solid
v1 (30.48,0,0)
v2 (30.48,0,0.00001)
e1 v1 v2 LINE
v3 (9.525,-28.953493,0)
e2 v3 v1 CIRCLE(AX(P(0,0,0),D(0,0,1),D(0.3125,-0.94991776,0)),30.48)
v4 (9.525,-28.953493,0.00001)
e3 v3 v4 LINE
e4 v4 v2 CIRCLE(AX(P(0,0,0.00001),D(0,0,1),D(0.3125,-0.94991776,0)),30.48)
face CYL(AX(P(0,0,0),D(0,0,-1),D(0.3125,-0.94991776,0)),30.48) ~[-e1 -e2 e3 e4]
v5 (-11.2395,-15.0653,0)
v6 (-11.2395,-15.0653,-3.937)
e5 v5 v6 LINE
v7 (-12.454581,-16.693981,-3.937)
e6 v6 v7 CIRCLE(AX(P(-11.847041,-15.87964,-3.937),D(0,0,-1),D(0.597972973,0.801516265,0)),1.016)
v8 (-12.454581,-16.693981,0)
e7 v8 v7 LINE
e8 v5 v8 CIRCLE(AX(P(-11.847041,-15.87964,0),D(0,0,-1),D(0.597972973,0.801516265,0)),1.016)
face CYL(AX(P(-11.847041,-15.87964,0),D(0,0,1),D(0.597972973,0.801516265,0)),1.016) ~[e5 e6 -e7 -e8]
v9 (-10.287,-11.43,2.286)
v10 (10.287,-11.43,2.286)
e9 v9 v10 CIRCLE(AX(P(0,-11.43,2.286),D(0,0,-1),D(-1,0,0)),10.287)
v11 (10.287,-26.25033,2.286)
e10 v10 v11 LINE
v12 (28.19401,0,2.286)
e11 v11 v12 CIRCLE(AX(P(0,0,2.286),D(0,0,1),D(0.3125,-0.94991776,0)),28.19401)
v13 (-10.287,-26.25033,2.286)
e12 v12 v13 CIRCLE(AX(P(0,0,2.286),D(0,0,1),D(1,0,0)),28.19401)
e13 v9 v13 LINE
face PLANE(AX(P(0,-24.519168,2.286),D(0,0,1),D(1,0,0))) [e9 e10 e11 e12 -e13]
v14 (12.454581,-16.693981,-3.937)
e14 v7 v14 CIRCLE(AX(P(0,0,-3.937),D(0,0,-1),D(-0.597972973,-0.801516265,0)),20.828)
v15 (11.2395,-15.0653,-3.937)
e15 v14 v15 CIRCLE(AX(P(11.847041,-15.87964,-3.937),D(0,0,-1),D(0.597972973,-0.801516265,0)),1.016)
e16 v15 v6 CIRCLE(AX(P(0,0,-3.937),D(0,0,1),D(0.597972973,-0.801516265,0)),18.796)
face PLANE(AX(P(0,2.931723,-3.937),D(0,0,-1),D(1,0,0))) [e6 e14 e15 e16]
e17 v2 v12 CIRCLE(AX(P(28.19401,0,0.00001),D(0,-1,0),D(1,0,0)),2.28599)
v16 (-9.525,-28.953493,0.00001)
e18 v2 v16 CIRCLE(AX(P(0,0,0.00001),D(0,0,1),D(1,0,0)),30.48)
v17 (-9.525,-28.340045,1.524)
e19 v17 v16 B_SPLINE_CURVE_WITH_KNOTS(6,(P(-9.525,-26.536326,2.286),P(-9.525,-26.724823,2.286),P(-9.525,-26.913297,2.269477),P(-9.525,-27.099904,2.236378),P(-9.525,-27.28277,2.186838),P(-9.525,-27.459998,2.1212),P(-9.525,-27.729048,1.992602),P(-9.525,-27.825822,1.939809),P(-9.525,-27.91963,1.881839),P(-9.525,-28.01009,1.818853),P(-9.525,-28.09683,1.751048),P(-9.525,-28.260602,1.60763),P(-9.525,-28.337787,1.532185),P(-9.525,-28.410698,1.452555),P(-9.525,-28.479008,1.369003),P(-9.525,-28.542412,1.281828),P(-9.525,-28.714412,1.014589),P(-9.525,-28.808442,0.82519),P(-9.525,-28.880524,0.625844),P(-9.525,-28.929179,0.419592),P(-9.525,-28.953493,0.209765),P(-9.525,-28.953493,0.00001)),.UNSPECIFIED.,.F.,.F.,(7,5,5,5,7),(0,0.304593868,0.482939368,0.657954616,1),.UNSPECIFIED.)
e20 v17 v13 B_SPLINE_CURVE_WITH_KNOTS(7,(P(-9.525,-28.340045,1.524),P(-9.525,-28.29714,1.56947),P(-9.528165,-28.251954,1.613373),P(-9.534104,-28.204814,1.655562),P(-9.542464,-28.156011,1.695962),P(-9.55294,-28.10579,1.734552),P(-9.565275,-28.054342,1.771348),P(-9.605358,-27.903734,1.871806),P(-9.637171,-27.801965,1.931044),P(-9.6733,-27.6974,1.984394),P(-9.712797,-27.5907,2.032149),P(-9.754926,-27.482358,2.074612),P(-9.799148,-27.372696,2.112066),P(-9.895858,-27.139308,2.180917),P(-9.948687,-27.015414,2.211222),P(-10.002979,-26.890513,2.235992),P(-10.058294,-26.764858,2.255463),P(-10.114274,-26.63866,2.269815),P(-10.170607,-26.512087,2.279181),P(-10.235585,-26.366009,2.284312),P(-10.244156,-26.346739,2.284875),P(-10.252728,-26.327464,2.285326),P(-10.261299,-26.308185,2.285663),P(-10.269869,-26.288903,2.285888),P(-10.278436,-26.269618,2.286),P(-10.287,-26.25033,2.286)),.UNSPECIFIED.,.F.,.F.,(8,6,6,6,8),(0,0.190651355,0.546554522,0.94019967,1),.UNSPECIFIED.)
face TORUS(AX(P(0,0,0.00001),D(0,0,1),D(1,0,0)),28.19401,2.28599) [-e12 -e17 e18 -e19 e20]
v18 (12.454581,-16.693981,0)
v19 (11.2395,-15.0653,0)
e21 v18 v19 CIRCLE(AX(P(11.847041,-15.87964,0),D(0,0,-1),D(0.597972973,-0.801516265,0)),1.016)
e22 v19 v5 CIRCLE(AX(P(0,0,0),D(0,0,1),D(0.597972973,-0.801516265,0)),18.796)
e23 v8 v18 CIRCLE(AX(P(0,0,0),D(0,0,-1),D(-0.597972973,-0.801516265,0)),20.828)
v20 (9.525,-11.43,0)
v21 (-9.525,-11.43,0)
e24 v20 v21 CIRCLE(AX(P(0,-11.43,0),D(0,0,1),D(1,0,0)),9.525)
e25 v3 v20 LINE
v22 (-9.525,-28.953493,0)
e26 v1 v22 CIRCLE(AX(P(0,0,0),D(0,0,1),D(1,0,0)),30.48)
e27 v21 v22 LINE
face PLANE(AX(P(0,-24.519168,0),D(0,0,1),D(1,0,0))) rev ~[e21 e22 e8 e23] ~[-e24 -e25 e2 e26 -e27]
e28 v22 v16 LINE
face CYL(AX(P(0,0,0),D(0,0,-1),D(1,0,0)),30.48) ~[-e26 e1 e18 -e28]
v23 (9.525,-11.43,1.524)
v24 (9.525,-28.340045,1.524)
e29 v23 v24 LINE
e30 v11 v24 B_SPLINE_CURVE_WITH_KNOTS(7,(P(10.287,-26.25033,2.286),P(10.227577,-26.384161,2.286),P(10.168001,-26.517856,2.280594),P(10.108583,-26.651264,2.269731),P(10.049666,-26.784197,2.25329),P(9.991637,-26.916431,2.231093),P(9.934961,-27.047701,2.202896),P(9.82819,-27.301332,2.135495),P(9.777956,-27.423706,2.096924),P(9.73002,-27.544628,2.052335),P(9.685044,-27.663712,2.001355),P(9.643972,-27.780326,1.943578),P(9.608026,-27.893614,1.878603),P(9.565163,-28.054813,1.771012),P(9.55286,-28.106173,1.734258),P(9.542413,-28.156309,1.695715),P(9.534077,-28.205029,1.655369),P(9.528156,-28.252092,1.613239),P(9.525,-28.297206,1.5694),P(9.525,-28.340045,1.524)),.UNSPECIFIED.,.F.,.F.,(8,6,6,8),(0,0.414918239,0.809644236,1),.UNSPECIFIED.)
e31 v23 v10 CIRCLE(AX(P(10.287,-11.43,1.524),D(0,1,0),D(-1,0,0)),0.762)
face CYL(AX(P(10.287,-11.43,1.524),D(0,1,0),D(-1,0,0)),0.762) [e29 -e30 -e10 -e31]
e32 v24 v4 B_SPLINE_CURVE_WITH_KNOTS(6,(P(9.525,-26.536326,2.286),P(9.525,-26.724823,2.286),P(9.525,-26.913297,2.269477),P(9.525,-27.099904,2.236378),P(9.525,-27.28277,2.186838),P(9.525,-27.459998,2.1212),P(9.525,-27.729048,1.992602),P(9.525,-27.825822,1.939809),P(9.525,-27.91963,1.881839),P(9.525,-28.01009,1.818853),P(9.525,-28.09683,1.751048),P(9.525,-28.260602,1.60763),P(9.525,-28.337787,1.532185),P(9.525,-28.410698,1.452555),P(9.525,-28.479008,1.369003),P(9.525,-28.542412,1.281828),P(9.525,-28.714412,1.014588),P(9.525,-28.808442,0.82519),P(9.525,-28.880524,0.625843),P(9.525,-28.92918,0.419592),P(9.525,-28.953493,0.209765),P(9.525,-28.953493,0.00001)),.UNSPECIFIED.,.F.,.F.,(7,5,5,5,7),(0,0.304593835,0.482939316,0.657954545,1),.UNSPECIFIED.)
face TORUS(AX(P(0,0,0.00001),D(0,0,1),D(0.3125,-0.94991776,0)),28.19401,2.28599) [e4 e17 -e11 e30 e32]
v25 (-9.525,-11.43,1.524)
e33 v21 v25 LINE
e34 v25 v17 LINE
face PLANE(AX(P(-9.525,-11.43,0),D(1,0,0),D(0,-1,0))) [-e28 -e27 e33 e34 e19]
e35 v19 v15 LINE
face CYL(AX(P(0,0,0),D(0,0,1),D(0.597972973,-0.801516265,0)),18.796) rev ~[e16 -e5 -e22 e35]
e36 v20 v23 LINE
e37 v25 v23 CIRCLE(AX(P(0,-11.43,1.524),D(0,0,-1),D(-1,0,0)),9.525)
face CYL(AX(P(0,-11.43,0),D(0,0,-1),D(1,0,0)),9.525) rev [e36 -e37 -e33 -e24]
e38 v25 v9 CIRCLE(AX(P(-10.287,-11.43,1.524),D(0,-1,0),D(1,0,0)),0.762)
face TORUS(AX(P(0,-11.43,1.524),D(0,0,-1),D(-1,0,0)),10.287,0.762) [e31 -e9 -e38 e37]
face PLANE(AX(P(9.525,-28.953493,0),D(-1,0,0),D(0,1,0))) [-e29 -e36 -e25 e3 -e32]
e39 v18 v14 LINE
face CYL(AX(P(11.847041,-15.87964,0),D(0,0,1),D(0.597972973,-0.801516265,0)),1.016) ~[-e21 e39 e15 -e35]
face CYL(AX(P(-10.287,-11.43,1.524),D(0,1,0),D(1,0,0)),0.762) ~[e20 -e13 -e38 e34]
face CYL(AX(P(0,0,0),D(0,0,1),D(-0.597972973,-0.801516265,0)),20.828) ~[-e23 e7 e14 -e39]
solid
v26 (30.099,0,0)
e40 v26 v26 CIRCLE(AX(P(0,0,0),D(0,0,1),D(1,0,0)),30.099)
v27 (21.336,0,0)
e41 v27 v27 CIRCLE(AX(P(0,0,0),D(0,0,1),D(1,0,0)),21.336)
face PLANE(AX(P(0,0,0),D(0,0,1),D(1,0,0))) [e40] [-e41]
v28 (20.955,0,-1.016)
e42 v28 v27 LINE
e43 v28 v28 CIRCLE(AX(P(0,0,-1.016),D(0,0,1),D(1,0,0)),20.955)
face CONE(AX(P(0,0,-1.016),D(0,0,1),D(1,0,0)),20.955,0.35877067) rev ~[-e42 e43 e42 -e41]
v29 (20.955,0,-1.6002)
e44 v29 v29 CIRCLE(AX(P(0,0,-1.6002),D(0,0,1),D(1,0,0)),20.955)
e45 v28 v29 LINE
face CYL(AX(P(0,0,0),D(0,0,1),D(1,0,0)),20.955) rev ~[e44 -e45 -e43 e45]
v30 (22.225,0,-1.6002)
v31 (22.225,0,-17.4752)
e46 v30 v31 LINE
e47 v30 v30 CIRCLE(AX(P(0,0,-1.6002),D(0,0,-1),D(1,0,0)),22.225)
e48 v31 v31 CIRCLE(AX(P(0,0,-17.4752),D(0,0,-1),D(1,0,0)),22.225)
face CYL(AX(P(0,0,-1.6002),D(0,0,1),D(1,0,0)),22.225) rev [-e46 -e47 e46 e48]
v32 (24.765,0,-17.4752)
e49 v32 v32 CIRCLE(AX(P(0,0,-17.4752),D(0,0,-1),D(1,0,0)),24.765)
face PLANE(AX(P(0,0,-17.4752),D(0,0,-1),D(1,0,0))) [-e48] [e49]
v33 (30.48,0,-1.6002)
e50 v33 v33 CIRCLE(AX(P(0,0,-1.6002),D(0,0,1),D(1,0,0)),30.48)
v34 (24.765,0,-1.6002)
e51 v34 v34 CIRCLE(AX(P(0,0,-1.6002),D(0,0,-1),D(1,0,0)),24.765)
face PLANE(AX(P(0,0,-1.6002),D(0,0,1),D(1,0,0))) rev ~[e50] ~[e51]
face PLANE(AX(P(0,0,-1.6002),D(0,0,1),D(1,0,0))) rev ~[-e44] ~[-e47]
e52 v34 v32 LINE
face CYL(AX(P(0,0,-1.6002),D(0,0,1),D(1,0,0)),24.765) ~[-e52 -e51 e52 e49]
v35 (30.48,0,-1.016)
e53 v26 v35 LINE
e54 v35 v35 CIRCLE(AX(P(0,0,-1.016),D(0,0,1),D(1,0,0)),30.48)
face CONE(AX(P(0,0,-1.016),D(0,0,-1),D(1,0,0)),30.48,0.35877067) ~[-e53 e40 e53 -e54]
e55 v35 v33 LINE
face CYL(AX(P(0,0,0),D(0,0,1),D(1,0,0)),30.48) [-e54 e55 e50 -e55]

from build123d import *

# Parameters (mm, degrees)
F0_R        = 30.48
F0_R_2      = 20.955
F1_DEPTH    = 1.6002
F2_R        = 24.765
F2_R_2      = 22.225
F3_DEPTH    = 15.875
F5_DEPTH    = 2.286
F6_R        = 2.28599
F7_DEPTH    = 2.287
F8_T1_DEPTH = 17.0113255723
F8_T4_ANGLE = 180
F10_DEPTH   = 3.937
F11_SIZE2   = 1.016
F11_SIZE    = 0.381
F12_SIZE2   = 0.381
F12_SIZE    = 1.016


# Not quite as in the source:
# - a fillet or chamfer that OpenCascade refuses, or shapes differently, is made with other operations: its cross-section is extruded or revolved along the edge and cut away or added
# - a fillet or chamfer is up to 0.001 mm smaller than in the source, because OpenCascade refuses the exact size


with BuildPart() as f1:
    # F0 (on Top) → F1 (new body)
    with BuildSketch(Plane.XY):
        Circle(F0_R)
        Circle(F0_R_2, mode=Mode.SUBTRACT)
    extrude(amount=-F1_DEPTH)

    # F2 (on face) → F3 (join)
    with BuildSketch(Plane(origin=(0, 0, -1.6002), x_dir=(1, 0, 0), z_dir=(0, 0, -1))):
        Circle(F2_R)
        Circle(F2_R_2, mode=Mode.SUBTRACT)
    extrude(amount=F3_DEPTH)

    # F11
    f11_edges = [f1.edges().sort_by_distance(p)[0] for p in [
        (-30.48, 0, 0),
    ]]
    f11_side = f1.faces().sort_by_distance((-29.617895, 0, 0))[0]
    chamfer(f11_edges, length=F11_SIZE, length2=F11_SIZE2, reference=f11_side)

    # F12
    f12_edges = [f1.edges().sort_by_distance(p)[0] for p in [
        (-20.955, 0, 0),
    ]]
    f12_side = f1.faces().sort_by_distance((-20.955, 0, -0.8001))[0]
    chamfer(f12_edges, length=F12_SIZE, length2=F12_SIZE2, reference=f12_side)


with BuildPart() as f5:
    # F4 (on face) → F5 (new body)
    with BuildSketch(Plane.XY):
        with BuildLine():
            Line((-9.525, -18.66511184), (-9.525, -28.9534933126))
            ThreePointArc((-9.525, -28.9534933126), (0, -30.48), (9.525, -28.9534933126))
            Line((9.525, -28.9534933126), (9.525, -18.66511184))
            ThreePointArc((9.525, -18.66511184), (0, -20.955), (-9.525, -18.66511184))
        make_face()
        with BuildLine():
            ThreePointArc((9.525, -28.9534933126), (24.6916220609, -17.8704840449), (30.48, 0))
            ThreePointArc((30.48, 0), (-17.8704840449, 24.6916220609), (-9.525, -28.9534933126))
            Line((-9.525, -28.9534933126), (-9.525, -18.66511184))
            ThreePointArc((-9.525, -18.66511184), (-10.9433918417, 17.8704840449), (20.955, 0))
            ThreePointArc((20.955, 0), (17.8704840449, -10.9433918417), (9.525, -18.66511184))
            Line((9.525, -18.66511184), (9.525, -28.9534933126))
        make_face()
        with BuildLine():
            Line((-9.525, -11.43), (-9.525, -18.66511184))
            ThreePointArc((-9.525, -18.66511184), (0, -20.955), (9.525, -18.66511184))
            Line((9.525, -18.66511184), (9.525, -11.43))
            ThreePointArc((9.525, -11.43), (0, -1.905), (-9.525, -11.43))
        make_face()
        with BuildLine():
            ThreePointArc((20.955, 0), (-10.9433918417, 17.8704840449), (-9.525, -18.66511184))
            Line((-9.525, -18.66511184), (-9.525, -11.43))
            ThreePointArc((-9.525, -11.43), (0, -1.905), (9.525, -11.43))
            Line((9.525, -11.43), (9.525, -18.66511184))
            ThreePointArc((9.525, -18.66511184), (17.8704840449, -10.9433918417), (20.955, 0))
        make_face()
    extrude(amount=F5_DEPTH)

    # F6 (radius 2.286 in the source; OpenCascade refuses exactly that, so slightly less here)
    f6_edges = [f5.edges().sort_by_distance(p)[0] for p in [
        (-9.525, 28.953493, 2.286),
    ]]
    fillet(f6_edges, radius=F6_R)

    # F4 (on face) → F7 (cut, through all)
    with BuildSketch(Plane.XY):
        with BuildLine():
            Line((-9.525, -11.43), (-9.525, -18.66511184))
            ThreePointArc((-9.525, -18.66511184), (0, -20.955), (9.525, -18.66511184))
            Line((9.525, -18.66511184), (9.525, -11.43))
            ThreePointArc((9.525, -11.43), (0, -1.905), (-9.525, -11.43))
        make_face()
        with BuildLine():
            Line((-9.525, -18.66511184), (-9.525, -28.9534933126))
            ThreePointArc((-9.525, -28.9534933126), (0, -30.48), (9.525, -28.9534933126))
            Line((9.525, -28.9534933126), (9.525, -18.66511184))
            ThreePointArc((9.525, -18.66511184), (0, -20.955), (-9.525, -18.66511184))
        make_face()
    extrude(amount=F7_DEPTH, mode=Mode.SUBTRACT)

    # F8: fillet of radius 0.762 on 3 edges, made by hand

    # F8_s2 → F8_t1 (cut)
    with BuildSketch(Plane.XZ.offset(11.43)):
        with BuildLine():
            ThreePointArc((-9.525, 1.524), (-9.7481846327, 2.0628153673), (-10.287, 2.286))
            Line((-10.287, 2.286), (-9.525, 2.286))
            Line((-9.525, 2.286), (-9.525, 1.524))
        make_face()
        with BuildLine():
            ThreePointArc((9.525, 1.524), (9.7481846327, 2.0628153673), (10.287, 2.286))
            Line((10.287, 2.286), (9.525, 2.286))
            Line((9.525, 2.286), (9.525, 1.524))
        make_face()
    extrude(amount=F8_T1_DEPTH, mode=Mode.SUBTRACT)

    # F8_s3 → F8_t4 (revolve, cut)
    with BuildSketch(Plane.XZ.offset(11.43)):
        with BuildLine():
            ThreePointArc((-9.525, 1.524), (-9.7481846327, 2.0628153673), (-10.287, 2.286))
            Line((-10.287, 2.286), (-9.525, 2.286))
            Line((-9.525, 2.286), (-9.525, 1.524))
        make_face()
    revolve(axis=Axis((0, -11.43, 2.286), (0, 0, -1)), revolution_arc=F8_T4_ANGLE, mode=Mode.SUBTRACT)

    # F9 (on face) → F10 (join)
    with BuildSketch(Plane(origin=(0, 0, 0), x_dir=(1, 0, 0), z_dir=(0, 0, -1))):
        with BuildLine():
            ThreePointArc((-12.4545810811, 16.6939807744), (0, -20.828), (12.4545810811, 16.6939807744))
            ThreePointArc((12.4545810811, 16.6939807744), (11.032700015, 16.4871807893), (11.2395, 15.0652997232))
            ThreePointArc((11.2395, 15.0652997232), (0, -18.796), (-11.2395, 15.0652997232))
            ThreePointArc((-11.2395, 15.0652997232), (-11.032700015, 16.4871807893), (-12.4545810811, 16.6939807744))
        make_face()
    extrude(amount=F10_DEPTH)


solid = Compound([f1.part, f5.part])
